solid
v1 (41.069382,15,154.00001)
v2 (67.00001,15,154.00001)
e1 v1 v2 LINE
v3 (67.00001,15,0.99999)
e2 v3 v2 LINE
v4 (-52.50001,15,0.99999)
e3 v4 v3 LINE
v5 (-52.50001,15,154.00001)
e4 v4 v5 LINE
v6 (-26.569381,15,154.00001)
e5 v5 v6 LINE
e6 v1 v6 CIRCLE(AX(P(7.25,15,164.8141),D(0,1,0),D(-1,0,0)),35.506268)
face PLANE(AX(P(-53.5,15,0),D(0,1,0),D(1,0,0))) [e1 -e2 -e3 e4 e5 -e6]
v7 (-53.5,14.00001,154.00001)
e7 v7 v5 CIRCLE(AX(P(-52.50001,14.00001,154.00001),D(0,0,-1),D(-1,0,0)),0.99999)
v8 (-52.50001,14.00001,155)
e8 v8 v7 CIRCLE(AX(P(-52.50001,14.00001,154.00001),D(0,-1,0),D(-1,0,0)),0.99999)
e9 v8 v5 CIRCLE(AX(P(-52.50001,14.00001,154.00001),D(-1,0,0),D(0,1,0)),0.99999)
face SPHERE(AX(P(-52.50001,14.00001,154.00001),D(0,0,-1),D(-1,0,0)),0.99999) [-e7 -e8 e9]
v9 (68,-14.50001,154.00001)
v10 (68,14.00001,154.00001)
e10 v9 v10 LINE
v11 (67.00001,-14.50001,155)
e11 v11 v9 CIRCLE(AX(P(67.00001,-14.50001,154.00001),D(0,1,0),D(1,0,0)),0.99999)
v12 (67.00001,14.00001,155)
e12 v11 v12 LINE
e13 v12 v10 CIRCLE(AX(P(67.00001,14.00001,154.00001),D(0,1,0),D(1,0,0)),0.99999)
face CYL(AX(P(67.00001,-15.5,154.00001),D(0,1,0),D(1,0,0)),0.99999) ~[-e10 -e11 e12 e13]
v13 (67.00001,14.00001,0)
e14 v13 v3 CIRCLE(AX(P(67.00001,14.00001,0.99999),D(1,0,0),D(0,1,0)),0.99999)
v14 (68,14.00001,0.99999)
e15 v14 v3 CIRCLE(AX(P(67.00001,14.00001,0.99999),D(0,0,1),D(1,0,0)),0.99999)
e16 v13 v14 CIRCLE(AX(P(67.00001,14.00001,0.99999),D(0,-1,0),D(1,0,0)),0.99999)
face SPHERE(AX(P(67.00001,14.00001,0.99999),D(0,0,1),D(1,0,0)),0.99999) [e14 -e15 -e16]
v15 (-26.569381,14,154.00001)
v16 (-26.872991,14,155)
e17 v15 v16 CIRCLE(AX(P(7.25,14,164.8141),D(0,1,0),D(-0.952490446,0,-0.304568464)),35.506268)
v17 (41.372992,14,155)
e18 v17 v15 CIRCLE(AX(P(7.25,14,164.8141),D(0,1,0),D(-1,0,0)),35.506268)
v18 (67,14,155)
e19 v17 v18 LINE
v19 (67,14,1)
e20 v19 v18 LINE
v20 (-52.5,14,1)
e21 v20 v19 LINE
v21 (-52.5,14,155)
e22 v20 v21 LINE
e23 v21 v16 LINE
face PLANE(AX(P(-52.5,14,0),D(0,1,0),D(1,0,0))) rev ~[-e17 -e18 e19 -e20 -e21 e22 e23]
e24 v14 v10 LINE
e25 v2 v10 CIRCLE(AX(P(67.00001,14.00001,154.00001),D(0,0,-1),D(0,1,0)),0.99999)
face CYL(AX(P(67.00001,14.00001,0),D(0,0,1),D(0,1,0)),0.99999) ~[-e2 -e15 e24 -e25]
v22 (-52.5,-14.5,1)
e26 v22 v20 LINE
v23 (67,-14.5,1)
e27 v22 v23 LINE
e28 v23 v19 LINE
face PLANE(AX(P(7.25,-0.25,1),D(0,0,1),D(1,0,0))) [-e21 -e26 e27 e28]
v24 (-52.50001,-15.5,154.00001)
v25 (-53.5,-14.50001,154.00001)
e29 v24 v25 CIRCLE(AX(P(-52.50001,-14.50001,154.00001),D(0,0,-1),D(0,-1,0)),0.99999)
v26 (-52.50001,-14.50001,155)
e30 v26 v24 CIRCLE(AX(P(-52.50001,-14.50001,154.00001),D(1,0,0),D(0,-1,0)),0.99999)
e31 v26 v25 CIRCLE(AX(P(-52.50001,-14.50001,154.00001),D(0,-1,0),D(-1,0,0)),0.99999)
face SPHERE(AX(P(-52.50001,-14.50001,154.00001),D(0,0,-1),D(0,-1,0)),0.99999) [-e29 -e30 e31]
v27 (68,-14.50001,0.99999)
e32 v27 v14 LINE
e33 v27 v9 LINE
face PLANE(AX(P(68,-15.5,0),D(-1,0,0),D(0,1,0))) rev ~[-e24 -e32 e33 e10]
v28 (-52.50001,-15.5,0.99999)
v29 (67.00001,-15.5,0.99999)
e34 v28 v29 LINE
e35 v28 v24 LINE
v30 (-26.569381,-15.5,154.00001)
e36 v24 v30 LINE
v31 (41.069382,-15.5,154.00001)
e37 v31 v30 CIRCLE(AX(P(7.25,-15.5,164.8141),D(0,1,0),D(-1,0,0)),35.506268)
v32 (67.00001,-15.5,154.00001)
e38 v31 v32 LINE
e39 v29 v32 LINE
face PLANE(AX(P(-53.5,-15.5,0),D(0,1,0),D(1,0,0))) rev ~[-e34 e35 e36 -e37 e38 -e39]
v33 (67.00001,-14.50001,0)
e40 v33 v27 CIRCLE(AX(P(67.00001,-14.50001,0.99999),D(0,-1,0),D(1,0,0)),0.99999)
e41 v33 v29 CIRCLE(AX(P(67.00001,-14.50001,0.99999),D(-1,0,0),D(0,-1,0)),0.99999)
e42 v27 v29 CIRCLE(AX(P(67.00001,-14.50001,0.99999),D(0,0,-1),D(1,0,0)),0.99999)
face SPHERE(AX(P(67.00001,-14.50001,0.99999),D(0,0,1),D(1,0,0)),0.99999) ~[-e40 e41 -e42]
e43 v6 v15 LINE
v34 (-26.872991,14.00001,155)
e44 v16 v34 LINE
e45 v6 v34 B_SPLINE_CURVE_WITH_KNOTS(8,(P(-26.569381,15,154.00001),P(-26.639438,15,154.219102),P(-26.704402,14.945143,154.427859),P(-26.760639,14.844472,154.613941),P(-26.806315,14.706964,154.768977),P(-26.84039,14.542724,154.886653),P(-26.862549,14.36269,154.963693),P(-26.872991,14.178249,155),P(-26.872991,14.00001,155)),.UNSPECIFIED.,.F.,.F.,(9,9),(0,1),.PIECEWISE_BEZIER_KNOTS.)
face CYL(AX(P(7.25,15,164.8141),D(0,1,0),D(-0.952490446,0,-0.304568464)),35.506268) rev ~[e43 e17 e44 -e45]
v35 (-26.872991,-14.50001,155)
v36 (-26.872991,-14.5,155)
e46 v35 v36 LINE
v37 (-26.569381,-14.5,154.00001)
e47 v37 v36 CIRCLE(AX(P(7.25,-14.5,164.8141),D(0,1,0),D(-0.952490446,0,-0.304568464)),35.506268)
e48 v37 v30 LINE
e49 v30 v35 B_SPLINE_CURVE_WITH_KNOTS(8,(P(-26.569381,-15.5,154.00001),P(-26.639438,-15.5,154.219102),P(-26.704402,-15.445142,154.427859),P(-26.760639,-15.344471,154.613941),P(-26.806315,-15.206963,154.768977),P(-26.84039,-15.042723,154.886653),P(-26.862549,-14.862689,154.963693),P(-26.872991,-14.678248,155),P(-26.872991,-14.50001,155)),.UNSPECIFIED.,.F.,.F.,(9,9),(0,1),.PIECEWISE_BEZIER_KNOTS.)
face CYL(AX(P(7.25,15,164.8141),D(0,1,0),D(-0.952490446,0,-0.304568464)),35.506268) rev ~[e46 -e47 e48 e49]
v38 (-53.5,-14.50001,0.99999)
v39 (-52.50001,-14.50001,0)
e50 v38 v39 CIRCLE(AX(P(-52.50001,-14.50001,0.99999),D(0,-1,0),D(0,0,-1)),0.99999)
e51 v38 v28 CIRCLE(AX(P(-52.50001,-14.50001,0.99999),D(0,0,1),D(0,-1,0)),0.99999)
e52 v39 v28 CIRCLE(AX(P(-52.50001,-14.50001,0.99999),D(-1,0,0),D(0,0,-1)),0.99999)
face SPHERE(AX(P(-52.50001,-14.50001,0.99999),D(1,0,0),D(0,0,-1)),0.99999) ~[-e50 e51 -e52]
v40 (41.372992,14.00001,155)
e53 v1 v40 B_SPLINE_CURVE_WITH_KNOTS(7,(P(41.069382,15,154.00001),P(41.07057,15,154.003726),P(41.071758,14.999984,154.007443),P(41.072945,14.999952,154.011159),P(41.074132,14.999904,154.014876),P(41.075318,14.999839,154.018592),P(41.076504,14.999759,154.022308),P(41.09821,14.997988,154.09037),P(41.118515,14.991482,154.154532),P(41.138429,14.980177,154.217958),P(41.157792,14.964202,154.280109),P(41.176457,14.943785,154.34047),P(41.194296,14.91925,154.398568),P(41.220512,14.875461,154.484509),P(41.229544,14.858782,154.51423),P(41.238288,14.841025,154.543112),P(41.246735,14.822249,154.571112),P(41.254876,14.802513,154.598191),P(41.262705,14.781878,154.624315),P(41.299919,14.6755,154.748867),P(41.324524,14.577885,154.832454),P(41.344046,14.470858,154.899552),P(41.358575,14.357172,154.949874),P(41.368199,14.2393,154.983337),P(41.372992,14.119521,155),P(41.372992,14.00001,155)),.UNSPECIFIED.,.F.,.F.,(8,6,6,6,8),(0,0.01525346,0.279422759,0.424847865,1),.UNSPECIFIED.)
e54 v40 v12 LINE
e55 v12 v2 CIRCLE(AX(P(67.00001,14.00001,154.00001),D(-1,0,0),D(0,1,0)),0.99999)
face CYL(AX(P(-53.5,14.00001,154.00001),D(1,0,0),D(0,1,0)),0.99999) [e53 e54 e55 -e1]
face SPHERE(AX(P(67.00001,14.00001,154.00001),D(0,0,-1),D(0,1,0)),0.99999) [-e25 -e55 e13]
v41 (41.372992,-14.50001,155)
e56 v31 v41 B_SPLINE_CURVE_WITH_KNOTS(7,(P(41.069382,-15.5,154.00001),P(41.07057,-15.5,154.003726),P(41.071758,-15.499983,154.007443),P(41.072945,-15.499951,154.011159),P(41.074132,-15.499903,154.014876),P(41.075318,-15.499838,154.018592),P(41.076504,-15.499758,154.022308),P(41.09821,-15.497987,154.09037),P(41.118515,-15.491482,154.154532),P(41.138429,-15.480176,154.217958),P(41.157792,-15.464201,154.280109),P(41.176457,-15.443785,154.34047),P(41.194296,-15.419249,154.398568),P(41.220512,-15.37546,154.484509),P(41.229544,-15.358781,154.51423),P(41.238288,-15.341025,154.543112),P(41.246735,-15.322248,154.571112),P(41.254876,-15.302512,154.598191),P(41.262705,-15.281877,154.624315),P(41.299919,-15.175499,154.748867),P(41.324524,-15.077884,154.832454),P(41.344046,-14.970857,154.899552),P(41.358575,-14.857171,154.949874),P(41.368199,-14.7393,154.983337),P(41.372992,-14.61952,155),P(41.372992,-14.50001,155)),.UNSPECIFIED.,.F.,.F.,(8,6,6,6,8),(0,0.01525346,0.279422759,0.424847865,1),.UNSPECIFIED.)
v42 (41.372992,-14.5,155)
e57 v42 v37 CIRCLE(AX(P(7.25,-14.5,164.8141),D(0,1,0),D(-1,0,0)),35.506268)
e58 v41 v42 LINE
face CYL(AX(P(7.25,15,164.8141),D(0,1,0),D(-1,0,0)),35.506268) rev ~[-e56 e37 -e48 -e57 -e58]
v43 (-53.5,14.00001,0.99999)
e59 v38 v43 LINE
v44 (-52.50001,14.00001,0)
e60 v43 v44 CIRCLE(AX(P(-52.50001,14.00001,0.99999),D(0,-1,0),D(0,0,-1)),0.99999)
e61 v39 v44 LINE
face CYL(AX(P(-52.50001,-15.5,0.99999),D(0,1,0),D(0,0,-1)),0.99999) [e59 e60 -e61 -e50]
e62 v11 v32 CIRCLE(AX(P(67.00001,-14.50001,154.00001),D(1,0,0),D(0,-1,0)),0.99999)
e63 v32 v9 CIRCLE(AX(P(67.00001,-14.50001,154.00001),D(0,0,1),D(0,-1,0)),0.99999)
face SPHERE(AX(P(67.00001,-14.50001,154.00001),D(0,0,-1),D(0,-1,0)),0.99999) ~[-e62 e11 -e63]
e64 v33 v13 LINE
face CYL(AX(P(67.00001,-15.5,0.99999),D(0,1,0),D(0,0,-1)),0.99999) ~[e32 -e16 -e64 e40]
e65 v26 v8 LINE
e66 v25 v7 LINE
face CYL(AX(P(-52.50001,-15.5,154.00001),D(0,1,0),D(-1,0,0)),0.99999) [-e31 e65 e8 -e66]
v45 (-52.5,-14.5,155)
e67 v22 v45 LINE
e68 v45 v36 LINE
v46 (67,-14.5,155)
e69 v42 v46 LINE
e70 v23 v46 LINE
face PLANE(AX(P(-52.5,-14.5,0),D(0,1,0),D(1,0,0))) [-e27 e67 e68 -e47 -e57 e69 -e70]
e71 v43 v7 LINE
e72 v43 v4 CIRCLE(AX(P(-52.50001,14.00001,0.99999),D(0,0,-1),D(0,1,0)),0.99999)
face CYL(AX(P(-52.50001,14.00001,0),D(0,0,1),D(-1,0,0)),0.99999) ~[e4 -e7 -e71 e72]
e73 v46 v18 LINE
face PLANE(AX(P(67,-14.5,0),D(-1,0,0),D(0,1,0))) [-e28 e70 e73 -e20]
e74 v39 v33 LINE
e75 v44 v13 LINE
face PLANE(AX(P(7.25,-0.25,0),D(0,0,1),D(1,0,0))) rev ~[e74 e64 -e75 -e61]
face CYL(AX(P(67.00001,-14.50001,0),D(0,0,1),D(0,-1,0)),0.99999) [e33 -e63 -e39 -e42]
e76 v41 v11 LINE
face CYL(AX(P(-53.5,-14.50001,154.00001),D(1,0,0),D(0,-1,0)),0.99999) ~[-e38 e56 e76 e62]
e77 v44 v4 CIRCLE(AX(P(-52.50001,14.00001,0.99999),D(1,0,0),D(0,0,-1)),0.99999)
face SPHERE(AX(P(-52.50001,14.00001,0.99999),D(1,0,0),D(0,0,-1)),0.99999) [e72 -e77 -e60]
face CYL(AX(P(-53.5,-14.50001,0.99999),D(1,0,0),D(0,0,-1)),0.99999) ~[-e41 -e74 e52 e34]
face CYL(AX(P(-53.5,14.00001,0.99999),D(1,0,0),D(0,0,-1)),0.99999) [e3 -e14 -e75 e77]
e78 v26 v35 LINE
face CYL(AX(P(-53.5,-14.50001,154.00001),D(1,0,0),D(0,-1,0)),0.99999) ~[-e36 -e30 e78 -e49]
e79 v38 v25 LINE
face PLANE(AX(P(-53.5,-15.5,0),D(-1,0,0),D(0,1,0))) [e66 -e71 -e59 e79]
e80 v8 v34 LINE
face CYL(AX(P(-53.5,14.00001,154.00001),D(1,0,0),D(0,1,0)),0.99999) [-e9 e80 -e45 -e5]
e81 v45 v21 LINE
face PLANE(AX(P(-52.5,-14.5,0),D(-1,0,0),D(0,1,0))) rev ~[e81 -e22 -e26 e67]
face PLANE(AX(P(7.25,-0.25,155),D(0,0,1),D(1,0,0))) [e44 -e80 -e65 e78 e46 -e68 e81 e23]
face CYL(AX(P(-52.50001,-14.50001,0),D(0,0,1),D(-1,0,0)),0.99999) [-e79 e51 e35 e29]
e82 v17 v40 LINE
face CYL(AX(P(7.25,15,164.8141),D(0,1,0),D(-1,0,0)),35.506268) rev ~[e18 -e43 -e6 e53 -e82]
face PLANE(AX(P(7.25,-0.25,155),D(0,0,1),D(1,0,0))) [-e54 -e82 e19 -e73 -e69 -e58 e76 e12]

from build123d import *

# Parameters (mm, degrees)
F0_W     = 121.5
F0_H     = 30.5
F0_W_2   = 119.5
F0_H_2   = 28.5
F1_DEPTH = 155
F2_DEPTH = 1
F3_R     = 0.99999
F5_DEPTH = 30.5


# Not quite as in the source:
# - a fillet or chamfer is up to 0.001 mm smaller than in the source, because OpenCascade refuses the exact size


with BuildPart() as f1:
    # F0 (on Top) → F1 (new body)
    with BuildSketch(Plane.XY):
        with Locations((7.2500004172, -0.2499995828)):
            Rectangle(F0_W, F0_H)
        with Locations((7.2500004172, -0.2499995828)):
            Rectangle(F0_W_2, F0_H_2, mode=Mode.SUBTRACT)
    extrude(amount=F1_DEPTH)

    # F0 (on Top) → F2 (join)
    with BuildSketch(Plane.XY):
        with Locations((7.2500004172, -0.2499995828)):
            Rectangle(F0_W_2, F0_H_2)
    extrude(amount=F2_DEPTH)

    # F3 (radius 1 in the source; OpenCascade refuses exactly that, so slightly less here)
    f3_edges = [f1.edges().sort_by_distance(p)[0] for p in [
        (68, -15.5, 77.5),
        (68, 15, 77.5),
        (68, -0.25, 0),
        (7.25, 15, 0),
        (7.25, -15.5, 0),
        (-53.5, -0.25, 0),
        (-53.5, -15.5, 77.5),
        (-53.5, 15, 77.5),
        (7.25, -15.5, 155),
        (-53.5, -0.25, 155),
        (7.25, 15, 155),
        (68, -0.25, 155),
    ]]
    fillet(f3_edges, radius=F3_R)

    # F4 (on face) → F5 (cut, through all)
    with BuildSketch(Plane(origin=(0, 15.0000004172, 0), x_dir=(-1, 0, 0), z_dir=(0, 1, 0))):
        with BuildLine():
            ThreePointArc((26.5693810998, 154.00001), (27.8320116519, 159.3416659555), (28.2562680656, 164.8140996695))
            ThreePointArc((28.2562680656, 164.8140996695), (-12.7224341312, 199.8961117386), (-41.0693819342, 154.00001))
            Line((-41.0693819342, 154.00001), (-7.2500004172, 154.00001))
            Line((-7.2500004172, 154.00001), (26.5693810998, 154.00001))
        make_face()
        with BuildLine():
            Line((-7.2500004172, 154.00001), (-41.0693819342, 154.00001))
            ThreePointArc((-41.0693819342, 154.00001), (-7.2500004172, 129.3078311867), (26.5693810998, 154.00001))
            Line((26.5693810998, 154.00001), (-7.2500004172, 154.00001))
        make_face()
    extrude(amount=-F5_DEPTH, mode=Mode.SUBTRACT)


solid = f1.part
